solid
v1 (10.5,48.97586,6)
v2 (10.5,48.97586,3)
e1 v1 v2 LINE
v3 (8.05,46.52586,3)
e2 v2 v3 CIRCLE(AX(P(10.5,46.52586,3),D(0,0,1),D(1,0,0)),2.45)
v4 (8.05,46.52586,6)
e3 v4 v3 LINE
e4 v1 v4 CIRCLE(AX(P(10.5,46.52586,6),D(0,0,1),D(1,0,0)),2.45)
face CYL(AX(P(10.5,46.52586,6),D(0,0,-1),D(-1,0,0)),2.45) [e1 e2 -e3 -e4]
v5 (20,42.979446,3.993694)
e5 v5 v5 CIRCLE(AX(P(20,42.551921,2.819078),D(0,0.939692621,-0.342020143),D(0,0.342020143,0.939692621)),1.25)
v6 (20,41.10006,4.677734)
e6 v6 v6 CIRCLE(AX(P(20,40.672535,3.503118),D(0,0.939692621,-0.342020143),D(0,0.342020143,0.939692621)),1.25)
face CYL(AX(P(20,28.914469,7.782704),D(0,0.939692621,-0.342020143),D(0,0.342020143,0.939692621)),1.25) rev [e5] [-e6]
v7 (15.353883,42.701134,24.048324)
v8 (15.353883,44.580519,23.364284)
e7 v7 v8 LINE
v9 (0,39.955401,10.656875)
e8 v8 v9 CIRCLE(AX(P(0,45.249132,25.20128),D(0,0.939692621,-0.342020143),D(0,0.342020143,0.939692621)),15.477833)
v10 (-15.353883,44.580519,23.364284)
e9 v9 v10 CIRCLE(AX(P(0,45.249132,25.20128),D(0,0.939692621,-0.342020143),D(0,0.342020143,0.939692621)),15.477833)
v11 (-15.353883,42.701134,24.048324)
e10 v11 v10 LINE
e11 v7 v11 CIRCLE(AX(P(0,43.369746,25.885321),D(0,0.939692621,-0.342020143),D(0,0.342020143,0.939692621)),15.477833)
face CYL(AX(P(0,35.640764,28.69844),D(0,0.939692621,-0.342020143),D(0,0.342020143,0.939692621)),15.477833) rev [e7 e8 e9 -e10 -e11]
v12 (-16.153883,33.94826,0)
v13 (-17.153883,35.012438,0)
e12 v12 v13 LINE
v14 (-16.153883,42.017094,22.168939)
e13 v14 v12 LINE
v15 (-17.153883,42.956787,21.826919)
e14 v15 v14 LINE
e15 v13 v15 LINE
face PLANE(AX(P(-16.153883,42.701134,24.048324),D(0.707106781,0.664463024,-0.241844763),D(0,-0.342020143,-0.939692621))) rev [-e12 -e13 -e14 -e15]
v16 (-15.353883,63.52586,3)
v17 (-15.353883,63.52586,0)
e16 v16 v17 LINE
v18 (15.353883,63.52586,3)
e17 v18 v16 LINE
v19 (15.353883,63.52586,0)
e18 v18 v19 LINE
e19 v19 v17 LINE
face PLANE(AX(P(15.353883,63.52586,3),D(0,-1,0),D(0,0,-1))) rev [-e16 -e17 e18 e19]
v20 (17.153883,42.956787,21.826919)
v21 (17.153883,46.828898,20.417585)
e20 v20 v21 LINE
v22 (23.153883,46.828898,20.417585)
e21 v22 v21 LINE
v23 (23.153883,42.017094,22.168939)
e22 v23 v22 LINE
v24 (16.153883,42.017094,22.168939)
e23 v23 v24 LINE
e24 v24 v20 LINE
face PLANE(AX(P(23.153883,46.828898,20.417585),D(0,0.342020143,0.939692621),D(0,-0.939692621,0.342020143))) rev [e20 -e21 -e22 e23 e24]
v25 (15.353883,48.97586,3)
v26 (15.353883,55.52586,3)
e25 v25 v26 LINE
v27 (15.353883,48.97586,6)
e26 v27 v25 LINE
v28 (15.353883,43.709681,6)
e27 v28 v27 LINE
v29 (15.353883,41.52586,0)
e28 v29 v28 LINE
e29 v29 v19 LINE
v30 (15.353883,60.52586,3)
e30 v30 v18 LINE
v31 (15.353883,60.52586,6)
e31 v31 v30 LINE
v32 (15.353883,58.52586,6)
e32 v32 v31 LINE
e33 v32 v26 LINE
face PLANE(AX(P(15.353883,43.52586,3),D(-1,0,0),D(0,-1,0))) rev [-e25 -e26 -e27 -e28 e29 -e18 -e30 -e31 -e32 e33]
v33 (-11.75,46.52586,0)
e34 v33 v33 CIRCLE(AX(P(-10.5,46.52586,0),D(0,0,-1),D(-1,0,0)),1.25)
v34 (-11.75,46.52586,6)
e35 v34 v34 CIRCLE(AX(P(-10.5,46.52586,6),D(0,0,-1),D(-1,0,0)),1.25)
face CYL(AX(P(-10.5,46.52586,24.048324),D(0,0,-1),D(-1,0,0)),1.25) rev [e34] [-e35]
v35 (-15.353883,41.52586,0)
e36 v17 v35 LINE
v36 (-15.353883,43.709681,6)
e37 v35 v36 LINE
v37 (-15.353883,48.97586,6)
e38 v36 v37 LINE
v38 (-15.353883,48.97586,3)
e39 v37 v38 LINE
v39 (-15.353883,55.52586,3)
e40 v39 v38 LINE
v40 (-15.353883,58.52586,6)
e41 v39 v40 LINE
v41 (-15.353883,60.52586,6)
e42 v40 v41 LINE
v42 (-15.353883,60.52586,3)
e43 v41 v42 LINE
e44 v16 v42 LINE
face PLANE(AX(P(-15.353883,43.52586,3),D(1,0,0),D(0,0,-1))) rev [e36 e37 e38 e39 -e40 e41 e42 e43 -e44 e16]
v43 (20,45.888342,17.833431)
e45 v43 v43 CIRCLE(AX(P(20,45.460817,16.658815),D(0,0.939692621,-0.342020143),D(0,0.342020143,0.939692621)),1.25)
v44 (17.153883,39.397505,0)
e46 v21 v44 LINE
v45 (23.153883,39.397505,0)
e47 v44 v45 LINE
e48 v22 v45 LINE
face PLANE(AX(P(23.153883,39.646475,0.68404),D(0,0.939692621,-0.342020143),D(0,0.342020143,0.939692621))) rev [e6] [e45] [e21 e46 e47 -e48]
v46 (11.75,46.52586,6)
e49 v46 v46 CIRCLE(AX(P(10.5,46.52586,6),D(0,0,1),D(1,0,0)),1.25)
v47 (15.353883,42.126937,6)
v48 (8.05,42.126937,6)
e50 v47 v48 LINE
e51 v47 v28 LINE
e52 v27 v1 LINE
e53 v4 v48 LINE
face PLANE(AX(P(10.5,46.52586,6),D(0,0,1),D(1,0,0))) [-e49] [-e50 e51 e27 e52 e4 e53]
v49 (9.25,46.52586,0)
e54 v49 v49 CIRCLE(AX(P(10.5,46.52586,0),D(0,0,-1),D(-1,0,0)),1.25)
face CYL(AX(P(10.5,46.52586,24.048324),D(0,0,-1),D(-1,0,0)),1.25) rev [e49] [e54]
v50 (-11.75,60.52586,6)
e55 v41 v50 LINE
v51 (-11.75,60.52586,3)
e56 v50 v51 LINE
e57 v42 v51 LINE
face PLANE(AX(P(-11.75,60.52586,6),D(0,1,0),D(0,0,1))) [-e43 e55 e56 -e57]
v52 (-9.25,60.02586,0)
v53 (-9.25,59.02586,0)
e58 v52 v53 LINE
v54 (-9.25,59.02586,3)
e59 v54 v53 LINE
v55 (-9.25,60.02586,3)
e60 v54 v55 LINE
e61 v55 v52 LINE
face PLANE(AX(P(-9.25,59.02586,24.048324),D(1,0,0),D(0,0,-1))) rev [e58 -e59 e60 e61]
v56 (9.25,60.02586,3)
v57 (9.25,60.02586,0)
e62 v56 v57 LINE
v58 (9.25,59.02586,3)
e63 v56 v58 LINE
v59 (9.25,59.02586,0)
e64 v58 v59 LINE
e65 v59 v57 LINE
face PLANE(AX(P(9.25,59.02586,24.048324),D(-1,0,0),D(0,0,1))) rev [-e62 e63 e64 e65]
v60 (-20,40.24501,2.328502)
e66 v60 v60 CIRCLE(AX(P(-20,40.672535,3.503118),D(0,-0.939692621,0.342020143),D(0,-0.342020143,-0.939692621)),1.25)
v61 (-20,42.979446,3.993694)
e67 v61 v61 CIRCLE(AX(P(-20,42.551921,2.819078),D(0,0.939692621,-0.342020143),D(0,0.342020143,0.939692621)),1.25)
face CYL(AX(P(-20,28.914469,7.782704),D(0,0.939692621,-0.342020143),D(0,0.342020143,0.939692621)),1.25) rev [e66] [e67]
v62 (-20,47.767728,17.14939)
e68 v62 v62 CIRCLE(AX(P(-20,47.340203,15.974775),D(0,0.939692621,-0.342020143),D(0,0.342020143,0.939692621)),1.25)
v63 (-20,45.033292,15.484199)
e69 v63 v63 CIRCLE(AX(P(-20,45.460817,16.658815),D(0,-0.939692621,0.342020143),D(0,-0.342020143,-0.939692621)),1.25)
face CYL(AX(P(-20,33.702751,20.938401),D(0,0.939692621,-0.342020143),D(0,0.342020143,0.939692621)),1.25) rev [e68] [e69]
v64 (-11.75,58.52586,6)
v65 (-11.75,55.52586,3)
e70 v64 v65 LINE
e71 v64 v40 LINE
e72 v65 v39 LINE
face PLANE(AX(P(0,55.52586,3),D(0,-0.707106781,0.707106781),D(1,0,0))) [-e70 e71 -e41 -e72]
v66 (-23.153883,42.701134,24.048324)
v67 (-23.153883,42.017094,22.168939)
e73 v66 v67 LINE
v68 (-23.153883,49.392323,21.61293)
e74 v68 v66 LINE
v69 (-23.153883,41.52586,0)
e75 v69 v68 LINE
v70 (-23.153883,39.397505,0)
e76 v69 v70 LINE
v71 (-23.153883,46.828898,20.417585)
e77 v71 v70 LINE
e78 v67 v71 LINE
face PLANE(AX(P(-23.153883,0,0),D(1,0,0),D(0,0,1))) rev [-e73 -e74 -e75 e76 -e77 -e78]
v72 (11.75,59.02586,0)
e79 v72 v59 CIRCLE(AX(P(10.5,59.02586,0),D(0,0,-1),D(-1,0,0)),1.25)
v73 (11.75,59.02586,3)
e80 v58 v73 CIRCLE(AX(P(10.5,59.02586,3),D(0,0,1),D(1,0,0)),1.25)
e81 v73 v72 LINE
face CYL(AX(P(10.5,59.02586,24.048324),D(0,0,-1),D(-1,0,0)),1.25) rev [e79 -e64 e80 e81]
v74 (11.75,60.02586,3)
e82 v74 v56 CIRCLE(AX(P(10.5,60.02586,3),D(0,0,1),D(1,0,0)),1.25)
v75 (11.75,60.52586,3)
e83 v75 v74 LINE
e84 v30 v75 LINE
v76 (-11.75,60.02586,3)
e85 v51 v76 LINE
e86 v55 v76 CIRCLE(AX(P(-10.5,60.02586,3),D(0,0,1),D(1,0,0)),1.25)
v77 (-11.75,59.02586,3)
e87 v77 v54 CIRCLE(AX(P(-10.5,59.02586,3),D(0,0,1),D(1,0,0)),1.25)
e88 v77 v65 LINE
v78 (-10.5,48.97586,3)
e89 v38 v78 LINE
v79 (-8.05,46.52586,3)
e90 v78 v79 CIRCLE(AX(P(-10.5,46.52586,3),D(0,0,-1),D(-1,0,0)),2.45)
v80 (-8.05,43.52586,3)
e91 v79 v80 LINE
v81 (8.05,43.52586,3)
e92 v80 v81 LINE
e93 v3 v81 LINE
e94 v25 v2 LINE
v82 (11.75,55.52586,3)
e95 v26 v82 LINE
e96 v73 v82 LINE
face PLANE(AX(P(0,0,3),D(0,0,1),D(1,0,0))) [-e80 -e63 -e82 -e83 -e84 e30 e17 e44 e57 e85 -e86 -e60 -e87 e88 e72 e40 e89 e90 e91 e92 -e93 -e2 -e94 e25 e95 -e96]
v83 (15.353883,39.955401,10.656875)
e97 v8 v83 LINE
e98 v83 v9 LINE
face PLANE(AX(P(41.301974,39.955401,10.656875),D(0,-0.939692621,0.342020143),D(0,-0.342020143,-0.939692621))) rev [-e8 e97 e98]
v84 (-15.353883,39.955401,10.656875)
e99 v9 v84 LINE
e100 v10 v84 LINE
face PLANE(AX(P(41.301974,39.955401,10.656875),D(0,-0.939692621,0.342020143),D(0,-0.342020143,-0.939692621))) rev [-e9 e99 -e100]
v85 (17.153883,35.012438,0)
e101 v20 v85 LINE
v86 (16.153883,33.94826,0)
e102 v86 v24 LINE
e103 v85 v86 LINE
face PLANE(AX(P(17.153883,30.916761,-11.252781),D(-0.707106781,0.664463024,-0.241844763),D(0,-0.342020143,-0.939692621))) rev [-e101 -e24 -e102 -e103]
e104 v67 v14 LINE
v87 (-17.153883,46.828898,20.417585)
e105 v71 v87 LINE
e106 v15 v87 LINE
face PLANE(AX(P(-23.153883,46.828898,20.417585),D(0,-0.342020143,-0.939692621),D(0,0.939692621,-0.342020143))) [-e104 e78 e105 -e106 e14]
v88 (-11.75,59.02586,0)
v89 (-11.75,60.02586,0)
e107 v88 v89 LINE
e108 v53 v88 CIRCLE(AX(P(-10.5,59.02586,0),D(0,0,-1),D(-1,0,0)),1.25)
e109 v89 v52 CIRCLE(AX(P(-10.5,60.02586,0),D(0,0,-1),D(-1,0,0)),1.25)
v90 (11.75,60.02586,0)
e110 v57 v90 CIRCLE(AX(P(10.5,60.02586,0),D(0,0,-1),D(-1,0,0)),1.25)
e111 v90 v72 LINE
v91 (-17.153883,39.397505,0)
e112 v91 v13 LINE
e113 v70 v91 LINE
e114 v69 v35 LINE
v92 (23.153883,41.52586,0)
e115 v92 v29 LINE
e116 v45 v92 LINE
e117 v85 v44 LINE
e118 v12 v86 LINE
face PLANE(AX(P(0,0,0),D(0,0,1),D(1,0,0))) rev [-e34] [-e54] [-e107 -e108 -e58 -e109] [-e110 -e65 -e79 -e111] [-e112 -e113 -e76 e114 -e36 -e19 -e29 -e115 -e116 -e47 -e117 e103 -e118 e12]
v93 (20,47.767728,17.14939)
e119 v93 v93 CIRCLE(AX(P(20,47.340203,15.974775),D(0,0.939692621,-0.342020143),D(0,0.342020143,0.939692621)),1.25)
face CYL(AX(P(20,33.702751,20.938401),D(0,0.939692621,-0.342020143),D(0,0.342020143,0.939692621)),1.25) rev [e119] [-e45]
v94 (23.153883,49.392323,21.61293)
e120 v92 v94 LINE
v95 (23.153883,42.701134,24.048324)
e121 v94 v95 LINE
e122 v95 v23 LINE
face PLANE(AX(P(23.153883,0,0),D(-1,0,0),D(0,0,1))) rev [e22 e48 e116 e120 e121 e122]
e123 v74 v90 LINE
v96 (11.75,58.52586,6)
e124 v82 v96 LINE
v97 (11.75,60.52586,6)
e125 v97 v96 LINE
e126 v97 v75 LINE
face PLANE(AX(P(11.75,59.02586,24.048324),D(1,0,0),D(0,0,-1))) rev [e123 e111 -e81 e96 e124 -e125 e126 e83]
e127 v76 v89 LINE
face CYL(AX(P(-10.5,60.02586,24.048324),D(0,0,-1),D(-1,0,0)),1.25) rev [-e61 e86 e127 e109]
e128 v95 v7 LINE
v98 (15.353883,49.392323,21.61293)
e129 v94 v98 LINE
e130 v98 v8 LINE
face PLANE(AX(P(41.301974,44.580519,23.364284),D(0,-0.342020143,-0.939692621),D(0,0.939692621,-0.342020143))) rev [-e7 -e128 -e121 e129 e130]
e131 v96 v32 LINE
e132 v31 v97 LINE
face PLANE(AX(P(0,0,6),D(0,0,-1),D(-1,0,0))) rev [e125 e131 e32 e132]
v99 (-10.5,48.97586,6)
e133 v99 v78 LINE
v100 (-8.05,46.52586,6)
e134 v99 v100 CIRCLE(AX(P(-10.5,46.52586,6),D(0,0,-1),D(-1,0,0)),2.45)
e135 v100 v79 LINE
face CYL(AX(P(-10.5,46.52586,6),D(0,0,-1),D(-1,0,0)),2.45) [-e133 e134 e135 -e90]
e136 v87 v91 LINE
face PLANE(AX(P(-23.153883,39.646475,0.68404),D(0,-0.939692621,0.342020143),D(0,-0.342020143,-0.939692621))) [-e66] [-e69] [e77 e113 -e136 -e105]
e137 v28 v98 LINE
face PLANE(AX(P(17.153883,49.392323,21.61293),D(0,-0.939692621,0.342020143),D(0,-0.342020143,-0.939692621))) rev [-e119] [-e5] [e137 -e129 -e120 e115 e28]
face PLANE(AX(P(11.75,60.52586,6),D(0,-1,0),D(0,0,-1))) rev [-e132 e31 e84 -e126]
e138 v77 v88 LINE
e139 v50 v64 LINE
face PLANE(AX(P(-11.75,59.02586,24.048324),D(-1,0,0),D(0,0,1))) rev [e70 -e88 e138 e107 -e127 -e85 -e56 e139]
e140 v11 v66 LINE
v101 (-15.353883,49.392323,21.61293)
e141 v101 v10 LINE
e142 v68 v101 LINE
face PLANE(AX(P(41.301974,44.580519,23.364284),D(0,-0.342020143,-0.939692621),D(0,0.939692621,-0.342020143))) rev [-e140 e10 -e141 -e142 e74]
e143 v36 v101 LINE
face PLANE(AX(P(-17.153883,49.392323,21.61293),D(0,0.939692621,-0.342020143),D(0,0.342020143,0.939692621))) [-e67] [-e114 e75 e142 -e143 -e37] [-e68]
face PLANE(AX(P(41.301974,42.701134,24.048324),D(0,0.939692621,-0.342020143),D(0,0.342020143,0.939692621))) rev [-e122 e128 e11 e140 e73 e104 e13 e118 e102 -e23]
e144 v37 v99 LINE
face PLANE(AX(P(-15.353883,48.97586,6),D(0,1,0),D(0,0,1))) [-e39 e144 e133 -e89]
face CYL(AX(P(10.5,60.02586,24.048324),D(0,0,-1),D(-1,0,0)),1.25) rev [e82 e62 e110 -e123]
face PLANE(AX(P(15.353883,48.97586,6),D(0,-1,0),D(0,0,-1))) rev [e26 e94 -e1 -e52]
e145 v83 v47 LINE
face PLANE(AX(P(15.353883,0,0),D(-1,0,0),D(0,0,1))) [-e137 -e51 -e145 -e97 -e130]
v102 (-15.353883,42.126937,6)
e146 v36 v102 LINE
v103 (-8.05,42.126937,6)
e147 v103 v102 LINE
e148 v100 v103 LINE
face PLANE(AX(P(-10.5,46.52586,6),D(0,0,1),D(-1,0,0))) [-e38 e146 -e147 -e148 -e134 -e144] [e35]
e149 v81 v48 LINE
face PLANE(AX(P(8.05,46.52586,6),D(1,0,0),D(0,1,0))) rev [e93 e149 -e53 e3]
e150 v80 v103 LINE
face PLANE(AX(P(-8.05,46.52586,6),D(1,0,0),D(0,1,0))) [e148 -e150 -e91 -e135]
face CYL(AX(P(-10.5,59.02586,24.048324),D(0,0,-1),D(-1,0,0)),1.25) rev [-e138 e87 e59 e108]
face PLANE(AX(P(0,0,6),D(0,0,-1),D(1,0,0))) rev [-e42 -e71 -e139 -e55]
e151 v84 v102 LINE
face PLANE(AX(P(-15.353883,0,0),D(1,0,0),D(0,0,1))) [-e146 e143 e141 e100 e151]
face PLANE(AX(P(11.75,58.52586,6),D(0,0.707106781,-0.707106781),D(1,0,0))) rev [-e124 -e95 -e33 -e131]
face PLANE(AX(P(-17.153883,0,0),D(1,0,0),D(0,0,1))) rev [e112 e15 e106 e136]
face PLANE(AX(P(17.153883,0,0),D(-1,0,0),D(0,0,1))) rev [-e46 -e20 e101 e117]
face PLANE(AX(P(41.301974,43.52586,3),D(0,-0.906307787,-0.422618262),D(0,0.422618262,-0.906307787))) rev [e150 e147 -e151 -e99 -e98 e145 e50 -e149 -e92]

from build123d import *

# Parameters (mm, degrees)
BOSS_EXTRUDE1_DEPTH             = 3
BOSS_EXTRUDE2_REACH             = 67.424
BOSS_EXTRUDE2_DIRECTION_2_REACH = 67.424
BOSS_EXTRUDE3_DEPTH             = 1.8
BOSS_EXTRUDE4_DEPTH             = 6
SKETCH5_R                       = 1.2500000000000013
CUT_EXTRUDE1_DEPTH              = 52.534261642227
BOSS_EXTRUDE5_START             = -17.153882977
BOSS_EXTRUDE5_DEPTH             = 34.307765954
BOSS_EXTRUDE5_START_2           = -23.153882977
BOSS_EXTRUDE5_2_DEPTH           = 46.307765954
SKETCH7_R                       = 1.2499999999999996
CUT_EXTRUDE2_DEPTH              = 72.76321538065721
SKETCH8_R                       = 1.2499999999999996
SKETCH8_W                       = 3.603882977174097
SKETCH8_H                       = 2
BOSS_EXTRUDE6_DEPTH             = 3
CHAMFER1_SIZE                   = 3
CHAMFER3_SIZE                   = 1
CUT_EXTRUDE3_DEPTH              = 54.0045843552169


# Read off the part's stored shape, not the designer's step: Boss-Extrude5
with BuildPart() as part:
    # Sketch1 → Boss-Extrude1 (new body)
    with BuildSketch(Plane.XY):
        Polygon((15.353882977174102, 43.52586008583906), (-15.3538829771741, 43.52586008583904), (-15.3538829771741, 63.52586008583905), (15.3538829771741, 63.52586008583905), align=None)
    extrude(amount=BOSS_EXTRUDE1_DEPTH)

    # Boss-Extrude2: up to this face of the body (flat: up to its plane)
    boss_extrude2_end = Plane(part.part.faces().sort_by_distance((15.353882977, 53.525860086, 1.5))[0])
    # Sketch2 → Boss-Extrude2 (add, up to the picked face)
    with BuildSketch(Plane(origin=(0, 0, 0), x_dir=(0, 0, -1), z_dir=(1, 0, 0)), mode=Mode.PRIVATE) as boss_extrude2_sk1:
        Polygon((-3, 43.52586008583906), (0, 43.52586008583906), (0, 41.52586008583906), (-2.4353936802444784, 34.83467094188486), (-24.048323958320367, 42.701134238375246), (-23.36428367166903, 44.580519479947064), (-10.656874598929635, 39.95540082282564), align=None)
    boss_extrude2_tool1 = split(extrude(boss_extrude2_sk1.sketch, amount=BOSS_EXTRUDE2_REACH, mode=Mode.PRIVATE), bisect_by=boss_extrude2_end, keep=Keep.BOTH, mode=Mode.PRIVATE)
    add(boss_extrude2_tool1.solids().sort_by(Axis((0, 40.026068, 8.762362), (1, 0, 0)))[0])

    # Boss-Extrude2 direction 2: up to this face of the body (flat: up to its plane)
    boss_extrude2_direction_2_end = Plane(part.part.faces().sort_by_distance((-15.353882977, 53.525860086, 1.5))[0])
    # Sketch2 → Boss-Extrude2 direction 2 (add, up to the picked face)
    with BuildSketch(Plane(origin=(0, 0, 0), x_dir=(0, 0, -1), z_dir=(1, 0, 0)), mode=Mode.PRIVATE) as boss_extrude2_direction_2_sk1:
        Polygon((-3, 43.52586008583906), (0, 43.52586008583906), (0, 41.52586008583906), (-2.4353936802444784, 34.83467094188486), (-24.048323958320367, 42.701134238375246), (-23.36428367166903, 44.580519479947064), (-10.656874598929635, 39.95540082282564), align=None)
    boss_extrude2_direction_2_tool1 = split(extrude(boss_extrude2_direction_2_sk1.sketch, amount=-BOSS_EXTRUDE2_DIRECTION_2_REACH, mode=Mode.PRIVATE), bisect_by=boss_extrude2_direction_2_end, keep=Keep.BOTH, mode=Mode.PRIVATE)
    add(boss_extrude2_direction_2_tool1.solids().sort_by(Axis((0, 40.026068, 8.762362), (-1, 0, 0)))[0])

    # Sketch3 → Boss-Extrude3 (add)
    with BuildSketch(Plane(origin=(15.353882977174106, 1.33e-15, 0), x_dir=(0, 0, -1), z_dir=(1, 9e-17, 0))):
        Polygon((-24.048323958320367, 42.701134238375246), (-2.4353936802444798, 34.83467094188486), (3.04e-15, 41.52586008583906), (-21.61293027807589, 49.392323382329444), align=None)
    boss_extrude3 = extrude(amount=BOSS_EXTRUDE3_DEPTH)

    # Sketch4 → Boss-Extrude4 (add)
    with BuildSketch(Plane(origin=(17.1538829771741, 0, 0), x_dir=(0, 0, -1), z_dir=(1, 0, 0))):
        Polygon((-24.048323958320367, 42.701134238375246), (-21.61293027807589, 49.392323382329444), (2.6e-15, 41.52586008583906), (-0.6840402866513355, 39.64647484426724), (-20.41758532315541, 46.82889785410629), (-22.168938716748553, 42.01709395172391), align=None)
    boss_extrude4 = extrude(amount=BOSS_EXTRUDE4_DEPTH)

    # Mirror1: Boss-Extrude3, Boss-Extrude4 across plane
    add(boss_extrude3.mirror(Plane(origin=(0, 0, 0), x_dir=(0, 0, 1), z_dir=(1, 0, 0))))
    add(boss_extrude4.mirror(Plane(origin=(0, 0, 0), x_dir=(0, 0, 1), z_dir=(1, 0, 0))))

    # Sketch5 → Cut-Extrude1 (cut, through all)
    with BuildSketch(Plane(origin=(3.18e-15, 36.66825722516614, -13.34615417237709), x_dir=(1, -8e-17, 3e-17), z_dir=(0, 0.9396926207859083, -0.3420201433256693))):
        with Locations(Location((-20.000000000000004, -31.20268061828034, 0), (0, 0, 270))):
            Circle(SKETCH5_R)
        with Locations(Location((-20.000000000000004, -17.20268061828034, 0), (0, 0, 270))):
            Circle(SKETCH5_R)
        with Locations(Location((19.999999999999996, -17.202680618280336, 0), (0, 0, 270))):
            Circle(SKETCH5_R)
        with Locations(Location((19.999999999999996, -31.202680618280336, 0), (0, 0, 270))):
            Circle(SKETCH5_R)
    extrude(amount=-CUT_EXTRUDE1_DEPTH, mode=Mode.SUBTRACT)

    # Boss-Extrude5 outline → Boss-Extrude5 (add)
    with BuildSketch(Plane.YZ.offset(BOSS_EXTRUDE5_START)):
        Polygon((41.525860086, 0), (34.834670942, 2.43539368), (33.948260134, 0), align=None)
    extrude(amount=BOSS_EXTRUDE5_DEPTH)

    # Boss-Extrude5 2 outline → Boss-Extrude5 2 (add)
    with BuildSketch(Plane.YZ.offset(BOSS_EXTRUDE5_START_2)):
        Polygon((39.397504541, 0), (41.525860086, 0), (39.646474844, 0.684040287), align=None)
    extrude(amount=BOSS_EXTRUDE5_2_DEPTH)

    # Sketch7 → Cut-Extrude2 (cut, through all)
    with BuildSketch(Plane(origin=(0, 0, 0), x_dir=(-1, 0, 0), z_dir=(0, 0, -1))):
        with Locations((-10.500000000000007, 46.525860085839064)):
            Circle(SKETCH7_R)
        with Locations((10.499999999999993, 46.52586008583907)):
            Circle(SKETCH7_R)
        with BuildLine():
            Line((-11.750000000000007, 59.02586008583907), (-11.750000000000007, 60.02586008583906))
            ThreePointArc((-11.750000000000007, 60.02586008583906), (-10.500000000000009, 61.27586008583905), (-9.250000000000016, 60.02586008583906))
            Line((-9.250000000000016, 60.02586008583906), (-9.250000000000016, 59.02586008583907))
            ThreePointArc((-9.250000000000016, 59.02586008583907), (-10.500000000000009, 57.77586008583907), (-11.750000000000007, 59.02586008583907))
        make_face()
        with BuildLine():
            Line((9.249999999999991, 59.02586008583907), (9.249999999999991, 60.02586008583906))
            ThreePointArc((9.249999999999991, 60.02586008583906), (10.499999999999984, 61.27586008583906), (11.749999999999982, 60.02586008583906))
            Line((11.749999999999982, 60.02586008583906), (11.749999999999982, 59.02586008583907))
            ThreePointArc((11.749999999999982, 59.02586008583907), (10.499999999999995, 57.77586008583907), (9.249999999999991, 59.02586008583907))
        make_face()
    extrude(amount=-CUT_EXTRUDE2_DEPTH, mode=Mode.SUBTRACT)

    # Sketch8 → Boss-Extrude6 (add)
    # profile 1 of 2: a face of its own
    with BuildSketch(Plane.XY.offset(3)):
        with BuildLine():
            Line((15.353882977174102, 48.97586008583905), (10.500000000000007, 48.97586008583905))
            ThreePointArc((10.500000000000007, 48.97586008583905), (8.767588386092974, 48.258271699746096), (8.050000000000013, 46.525860085839064))
            Line((8.050000000000013, 46.525860085839064), (8.050000000000015, 40.525860085839064))
            Line((8.050000000000015, 40.525860085839064), (15.353882977174102, 40.525860085839064))
            Line((15.353882977174102, 40.525860085839064), (15.353882977174102, 48.97586008583905))
        make_face()
        with Locations(Location((10.500000000000007, 46.525860085839064, 0), (0, 0, 180))):
            Circle(SKETCH8_R, mode=Mode.SUBTRACT)
    # profile 2 of 2: a face of its own
    with BuildSketch(Plane.XY.offset(3)):
        with Locations((13.551941488587055, 59.52586008583907)):
            Rectangle(SKETCH8_W, SKETCH8_H)
    boss_extrude6 = extrude(amount=BOSS_EXTRUDE6_DEPTH)

    # Mirror2: Boss-Extrude6 across plane
    add(boss_extrude6.mirror(Plane(origin=(0, 0, 0), x_dir=(0, 0, 1), z_dir=(1, 0, 0))))

    # Chamfer1
    chamfer1_edges = [part.edges().sort_by_distance(p)[0] for p in [
        (13.551941488587055, 58.525860085839064, 3),
        (-13.551941488587055, 58.525860085839064, 3),
    ]]
    chamfer(chamfer1_edges, length=CHAMFER1_SIZE - 0.0001)  # a hair under: the kernel refuses the full size

    # Chamfer3
    chamfer3_edges = [part.edges().sort_by_distance(p)[0] for p in [
        (17.153882977174103, 38.42588244680438, 12.302166198496515),
        (-17.1538829771741, 38.42588244680438, 12.302166198496515),
    ]]
    chamfer(chamfer3_edges, length=CHAMFER3_SIZE)

    # Sketch9 → Cut-Extrude3 (cut, through all)
    with BuildSketch(Plane(origin=(0, 31.856453322783743, -11.59480077878396), x_dir=(1, 0, 0), z_dir=(0, 0.9396926207859083, -0.3420201433256693))):
        with BuildLine():
            Line((15.353882977174102, -37.20268061828036), (-15.3538829771741, -37.20268061828037))
            ThreePointArc((-15.3538829771741, -37.20268061828037), (-4.5e-16, -23.67973833731235), (15.353882977174102, -37.20268061828036))
        make_face()
    extrude(amount=-CUT_EXTRUDE3_DEPTH, mode=Mode.SUBTRACT)


solid = part.part
